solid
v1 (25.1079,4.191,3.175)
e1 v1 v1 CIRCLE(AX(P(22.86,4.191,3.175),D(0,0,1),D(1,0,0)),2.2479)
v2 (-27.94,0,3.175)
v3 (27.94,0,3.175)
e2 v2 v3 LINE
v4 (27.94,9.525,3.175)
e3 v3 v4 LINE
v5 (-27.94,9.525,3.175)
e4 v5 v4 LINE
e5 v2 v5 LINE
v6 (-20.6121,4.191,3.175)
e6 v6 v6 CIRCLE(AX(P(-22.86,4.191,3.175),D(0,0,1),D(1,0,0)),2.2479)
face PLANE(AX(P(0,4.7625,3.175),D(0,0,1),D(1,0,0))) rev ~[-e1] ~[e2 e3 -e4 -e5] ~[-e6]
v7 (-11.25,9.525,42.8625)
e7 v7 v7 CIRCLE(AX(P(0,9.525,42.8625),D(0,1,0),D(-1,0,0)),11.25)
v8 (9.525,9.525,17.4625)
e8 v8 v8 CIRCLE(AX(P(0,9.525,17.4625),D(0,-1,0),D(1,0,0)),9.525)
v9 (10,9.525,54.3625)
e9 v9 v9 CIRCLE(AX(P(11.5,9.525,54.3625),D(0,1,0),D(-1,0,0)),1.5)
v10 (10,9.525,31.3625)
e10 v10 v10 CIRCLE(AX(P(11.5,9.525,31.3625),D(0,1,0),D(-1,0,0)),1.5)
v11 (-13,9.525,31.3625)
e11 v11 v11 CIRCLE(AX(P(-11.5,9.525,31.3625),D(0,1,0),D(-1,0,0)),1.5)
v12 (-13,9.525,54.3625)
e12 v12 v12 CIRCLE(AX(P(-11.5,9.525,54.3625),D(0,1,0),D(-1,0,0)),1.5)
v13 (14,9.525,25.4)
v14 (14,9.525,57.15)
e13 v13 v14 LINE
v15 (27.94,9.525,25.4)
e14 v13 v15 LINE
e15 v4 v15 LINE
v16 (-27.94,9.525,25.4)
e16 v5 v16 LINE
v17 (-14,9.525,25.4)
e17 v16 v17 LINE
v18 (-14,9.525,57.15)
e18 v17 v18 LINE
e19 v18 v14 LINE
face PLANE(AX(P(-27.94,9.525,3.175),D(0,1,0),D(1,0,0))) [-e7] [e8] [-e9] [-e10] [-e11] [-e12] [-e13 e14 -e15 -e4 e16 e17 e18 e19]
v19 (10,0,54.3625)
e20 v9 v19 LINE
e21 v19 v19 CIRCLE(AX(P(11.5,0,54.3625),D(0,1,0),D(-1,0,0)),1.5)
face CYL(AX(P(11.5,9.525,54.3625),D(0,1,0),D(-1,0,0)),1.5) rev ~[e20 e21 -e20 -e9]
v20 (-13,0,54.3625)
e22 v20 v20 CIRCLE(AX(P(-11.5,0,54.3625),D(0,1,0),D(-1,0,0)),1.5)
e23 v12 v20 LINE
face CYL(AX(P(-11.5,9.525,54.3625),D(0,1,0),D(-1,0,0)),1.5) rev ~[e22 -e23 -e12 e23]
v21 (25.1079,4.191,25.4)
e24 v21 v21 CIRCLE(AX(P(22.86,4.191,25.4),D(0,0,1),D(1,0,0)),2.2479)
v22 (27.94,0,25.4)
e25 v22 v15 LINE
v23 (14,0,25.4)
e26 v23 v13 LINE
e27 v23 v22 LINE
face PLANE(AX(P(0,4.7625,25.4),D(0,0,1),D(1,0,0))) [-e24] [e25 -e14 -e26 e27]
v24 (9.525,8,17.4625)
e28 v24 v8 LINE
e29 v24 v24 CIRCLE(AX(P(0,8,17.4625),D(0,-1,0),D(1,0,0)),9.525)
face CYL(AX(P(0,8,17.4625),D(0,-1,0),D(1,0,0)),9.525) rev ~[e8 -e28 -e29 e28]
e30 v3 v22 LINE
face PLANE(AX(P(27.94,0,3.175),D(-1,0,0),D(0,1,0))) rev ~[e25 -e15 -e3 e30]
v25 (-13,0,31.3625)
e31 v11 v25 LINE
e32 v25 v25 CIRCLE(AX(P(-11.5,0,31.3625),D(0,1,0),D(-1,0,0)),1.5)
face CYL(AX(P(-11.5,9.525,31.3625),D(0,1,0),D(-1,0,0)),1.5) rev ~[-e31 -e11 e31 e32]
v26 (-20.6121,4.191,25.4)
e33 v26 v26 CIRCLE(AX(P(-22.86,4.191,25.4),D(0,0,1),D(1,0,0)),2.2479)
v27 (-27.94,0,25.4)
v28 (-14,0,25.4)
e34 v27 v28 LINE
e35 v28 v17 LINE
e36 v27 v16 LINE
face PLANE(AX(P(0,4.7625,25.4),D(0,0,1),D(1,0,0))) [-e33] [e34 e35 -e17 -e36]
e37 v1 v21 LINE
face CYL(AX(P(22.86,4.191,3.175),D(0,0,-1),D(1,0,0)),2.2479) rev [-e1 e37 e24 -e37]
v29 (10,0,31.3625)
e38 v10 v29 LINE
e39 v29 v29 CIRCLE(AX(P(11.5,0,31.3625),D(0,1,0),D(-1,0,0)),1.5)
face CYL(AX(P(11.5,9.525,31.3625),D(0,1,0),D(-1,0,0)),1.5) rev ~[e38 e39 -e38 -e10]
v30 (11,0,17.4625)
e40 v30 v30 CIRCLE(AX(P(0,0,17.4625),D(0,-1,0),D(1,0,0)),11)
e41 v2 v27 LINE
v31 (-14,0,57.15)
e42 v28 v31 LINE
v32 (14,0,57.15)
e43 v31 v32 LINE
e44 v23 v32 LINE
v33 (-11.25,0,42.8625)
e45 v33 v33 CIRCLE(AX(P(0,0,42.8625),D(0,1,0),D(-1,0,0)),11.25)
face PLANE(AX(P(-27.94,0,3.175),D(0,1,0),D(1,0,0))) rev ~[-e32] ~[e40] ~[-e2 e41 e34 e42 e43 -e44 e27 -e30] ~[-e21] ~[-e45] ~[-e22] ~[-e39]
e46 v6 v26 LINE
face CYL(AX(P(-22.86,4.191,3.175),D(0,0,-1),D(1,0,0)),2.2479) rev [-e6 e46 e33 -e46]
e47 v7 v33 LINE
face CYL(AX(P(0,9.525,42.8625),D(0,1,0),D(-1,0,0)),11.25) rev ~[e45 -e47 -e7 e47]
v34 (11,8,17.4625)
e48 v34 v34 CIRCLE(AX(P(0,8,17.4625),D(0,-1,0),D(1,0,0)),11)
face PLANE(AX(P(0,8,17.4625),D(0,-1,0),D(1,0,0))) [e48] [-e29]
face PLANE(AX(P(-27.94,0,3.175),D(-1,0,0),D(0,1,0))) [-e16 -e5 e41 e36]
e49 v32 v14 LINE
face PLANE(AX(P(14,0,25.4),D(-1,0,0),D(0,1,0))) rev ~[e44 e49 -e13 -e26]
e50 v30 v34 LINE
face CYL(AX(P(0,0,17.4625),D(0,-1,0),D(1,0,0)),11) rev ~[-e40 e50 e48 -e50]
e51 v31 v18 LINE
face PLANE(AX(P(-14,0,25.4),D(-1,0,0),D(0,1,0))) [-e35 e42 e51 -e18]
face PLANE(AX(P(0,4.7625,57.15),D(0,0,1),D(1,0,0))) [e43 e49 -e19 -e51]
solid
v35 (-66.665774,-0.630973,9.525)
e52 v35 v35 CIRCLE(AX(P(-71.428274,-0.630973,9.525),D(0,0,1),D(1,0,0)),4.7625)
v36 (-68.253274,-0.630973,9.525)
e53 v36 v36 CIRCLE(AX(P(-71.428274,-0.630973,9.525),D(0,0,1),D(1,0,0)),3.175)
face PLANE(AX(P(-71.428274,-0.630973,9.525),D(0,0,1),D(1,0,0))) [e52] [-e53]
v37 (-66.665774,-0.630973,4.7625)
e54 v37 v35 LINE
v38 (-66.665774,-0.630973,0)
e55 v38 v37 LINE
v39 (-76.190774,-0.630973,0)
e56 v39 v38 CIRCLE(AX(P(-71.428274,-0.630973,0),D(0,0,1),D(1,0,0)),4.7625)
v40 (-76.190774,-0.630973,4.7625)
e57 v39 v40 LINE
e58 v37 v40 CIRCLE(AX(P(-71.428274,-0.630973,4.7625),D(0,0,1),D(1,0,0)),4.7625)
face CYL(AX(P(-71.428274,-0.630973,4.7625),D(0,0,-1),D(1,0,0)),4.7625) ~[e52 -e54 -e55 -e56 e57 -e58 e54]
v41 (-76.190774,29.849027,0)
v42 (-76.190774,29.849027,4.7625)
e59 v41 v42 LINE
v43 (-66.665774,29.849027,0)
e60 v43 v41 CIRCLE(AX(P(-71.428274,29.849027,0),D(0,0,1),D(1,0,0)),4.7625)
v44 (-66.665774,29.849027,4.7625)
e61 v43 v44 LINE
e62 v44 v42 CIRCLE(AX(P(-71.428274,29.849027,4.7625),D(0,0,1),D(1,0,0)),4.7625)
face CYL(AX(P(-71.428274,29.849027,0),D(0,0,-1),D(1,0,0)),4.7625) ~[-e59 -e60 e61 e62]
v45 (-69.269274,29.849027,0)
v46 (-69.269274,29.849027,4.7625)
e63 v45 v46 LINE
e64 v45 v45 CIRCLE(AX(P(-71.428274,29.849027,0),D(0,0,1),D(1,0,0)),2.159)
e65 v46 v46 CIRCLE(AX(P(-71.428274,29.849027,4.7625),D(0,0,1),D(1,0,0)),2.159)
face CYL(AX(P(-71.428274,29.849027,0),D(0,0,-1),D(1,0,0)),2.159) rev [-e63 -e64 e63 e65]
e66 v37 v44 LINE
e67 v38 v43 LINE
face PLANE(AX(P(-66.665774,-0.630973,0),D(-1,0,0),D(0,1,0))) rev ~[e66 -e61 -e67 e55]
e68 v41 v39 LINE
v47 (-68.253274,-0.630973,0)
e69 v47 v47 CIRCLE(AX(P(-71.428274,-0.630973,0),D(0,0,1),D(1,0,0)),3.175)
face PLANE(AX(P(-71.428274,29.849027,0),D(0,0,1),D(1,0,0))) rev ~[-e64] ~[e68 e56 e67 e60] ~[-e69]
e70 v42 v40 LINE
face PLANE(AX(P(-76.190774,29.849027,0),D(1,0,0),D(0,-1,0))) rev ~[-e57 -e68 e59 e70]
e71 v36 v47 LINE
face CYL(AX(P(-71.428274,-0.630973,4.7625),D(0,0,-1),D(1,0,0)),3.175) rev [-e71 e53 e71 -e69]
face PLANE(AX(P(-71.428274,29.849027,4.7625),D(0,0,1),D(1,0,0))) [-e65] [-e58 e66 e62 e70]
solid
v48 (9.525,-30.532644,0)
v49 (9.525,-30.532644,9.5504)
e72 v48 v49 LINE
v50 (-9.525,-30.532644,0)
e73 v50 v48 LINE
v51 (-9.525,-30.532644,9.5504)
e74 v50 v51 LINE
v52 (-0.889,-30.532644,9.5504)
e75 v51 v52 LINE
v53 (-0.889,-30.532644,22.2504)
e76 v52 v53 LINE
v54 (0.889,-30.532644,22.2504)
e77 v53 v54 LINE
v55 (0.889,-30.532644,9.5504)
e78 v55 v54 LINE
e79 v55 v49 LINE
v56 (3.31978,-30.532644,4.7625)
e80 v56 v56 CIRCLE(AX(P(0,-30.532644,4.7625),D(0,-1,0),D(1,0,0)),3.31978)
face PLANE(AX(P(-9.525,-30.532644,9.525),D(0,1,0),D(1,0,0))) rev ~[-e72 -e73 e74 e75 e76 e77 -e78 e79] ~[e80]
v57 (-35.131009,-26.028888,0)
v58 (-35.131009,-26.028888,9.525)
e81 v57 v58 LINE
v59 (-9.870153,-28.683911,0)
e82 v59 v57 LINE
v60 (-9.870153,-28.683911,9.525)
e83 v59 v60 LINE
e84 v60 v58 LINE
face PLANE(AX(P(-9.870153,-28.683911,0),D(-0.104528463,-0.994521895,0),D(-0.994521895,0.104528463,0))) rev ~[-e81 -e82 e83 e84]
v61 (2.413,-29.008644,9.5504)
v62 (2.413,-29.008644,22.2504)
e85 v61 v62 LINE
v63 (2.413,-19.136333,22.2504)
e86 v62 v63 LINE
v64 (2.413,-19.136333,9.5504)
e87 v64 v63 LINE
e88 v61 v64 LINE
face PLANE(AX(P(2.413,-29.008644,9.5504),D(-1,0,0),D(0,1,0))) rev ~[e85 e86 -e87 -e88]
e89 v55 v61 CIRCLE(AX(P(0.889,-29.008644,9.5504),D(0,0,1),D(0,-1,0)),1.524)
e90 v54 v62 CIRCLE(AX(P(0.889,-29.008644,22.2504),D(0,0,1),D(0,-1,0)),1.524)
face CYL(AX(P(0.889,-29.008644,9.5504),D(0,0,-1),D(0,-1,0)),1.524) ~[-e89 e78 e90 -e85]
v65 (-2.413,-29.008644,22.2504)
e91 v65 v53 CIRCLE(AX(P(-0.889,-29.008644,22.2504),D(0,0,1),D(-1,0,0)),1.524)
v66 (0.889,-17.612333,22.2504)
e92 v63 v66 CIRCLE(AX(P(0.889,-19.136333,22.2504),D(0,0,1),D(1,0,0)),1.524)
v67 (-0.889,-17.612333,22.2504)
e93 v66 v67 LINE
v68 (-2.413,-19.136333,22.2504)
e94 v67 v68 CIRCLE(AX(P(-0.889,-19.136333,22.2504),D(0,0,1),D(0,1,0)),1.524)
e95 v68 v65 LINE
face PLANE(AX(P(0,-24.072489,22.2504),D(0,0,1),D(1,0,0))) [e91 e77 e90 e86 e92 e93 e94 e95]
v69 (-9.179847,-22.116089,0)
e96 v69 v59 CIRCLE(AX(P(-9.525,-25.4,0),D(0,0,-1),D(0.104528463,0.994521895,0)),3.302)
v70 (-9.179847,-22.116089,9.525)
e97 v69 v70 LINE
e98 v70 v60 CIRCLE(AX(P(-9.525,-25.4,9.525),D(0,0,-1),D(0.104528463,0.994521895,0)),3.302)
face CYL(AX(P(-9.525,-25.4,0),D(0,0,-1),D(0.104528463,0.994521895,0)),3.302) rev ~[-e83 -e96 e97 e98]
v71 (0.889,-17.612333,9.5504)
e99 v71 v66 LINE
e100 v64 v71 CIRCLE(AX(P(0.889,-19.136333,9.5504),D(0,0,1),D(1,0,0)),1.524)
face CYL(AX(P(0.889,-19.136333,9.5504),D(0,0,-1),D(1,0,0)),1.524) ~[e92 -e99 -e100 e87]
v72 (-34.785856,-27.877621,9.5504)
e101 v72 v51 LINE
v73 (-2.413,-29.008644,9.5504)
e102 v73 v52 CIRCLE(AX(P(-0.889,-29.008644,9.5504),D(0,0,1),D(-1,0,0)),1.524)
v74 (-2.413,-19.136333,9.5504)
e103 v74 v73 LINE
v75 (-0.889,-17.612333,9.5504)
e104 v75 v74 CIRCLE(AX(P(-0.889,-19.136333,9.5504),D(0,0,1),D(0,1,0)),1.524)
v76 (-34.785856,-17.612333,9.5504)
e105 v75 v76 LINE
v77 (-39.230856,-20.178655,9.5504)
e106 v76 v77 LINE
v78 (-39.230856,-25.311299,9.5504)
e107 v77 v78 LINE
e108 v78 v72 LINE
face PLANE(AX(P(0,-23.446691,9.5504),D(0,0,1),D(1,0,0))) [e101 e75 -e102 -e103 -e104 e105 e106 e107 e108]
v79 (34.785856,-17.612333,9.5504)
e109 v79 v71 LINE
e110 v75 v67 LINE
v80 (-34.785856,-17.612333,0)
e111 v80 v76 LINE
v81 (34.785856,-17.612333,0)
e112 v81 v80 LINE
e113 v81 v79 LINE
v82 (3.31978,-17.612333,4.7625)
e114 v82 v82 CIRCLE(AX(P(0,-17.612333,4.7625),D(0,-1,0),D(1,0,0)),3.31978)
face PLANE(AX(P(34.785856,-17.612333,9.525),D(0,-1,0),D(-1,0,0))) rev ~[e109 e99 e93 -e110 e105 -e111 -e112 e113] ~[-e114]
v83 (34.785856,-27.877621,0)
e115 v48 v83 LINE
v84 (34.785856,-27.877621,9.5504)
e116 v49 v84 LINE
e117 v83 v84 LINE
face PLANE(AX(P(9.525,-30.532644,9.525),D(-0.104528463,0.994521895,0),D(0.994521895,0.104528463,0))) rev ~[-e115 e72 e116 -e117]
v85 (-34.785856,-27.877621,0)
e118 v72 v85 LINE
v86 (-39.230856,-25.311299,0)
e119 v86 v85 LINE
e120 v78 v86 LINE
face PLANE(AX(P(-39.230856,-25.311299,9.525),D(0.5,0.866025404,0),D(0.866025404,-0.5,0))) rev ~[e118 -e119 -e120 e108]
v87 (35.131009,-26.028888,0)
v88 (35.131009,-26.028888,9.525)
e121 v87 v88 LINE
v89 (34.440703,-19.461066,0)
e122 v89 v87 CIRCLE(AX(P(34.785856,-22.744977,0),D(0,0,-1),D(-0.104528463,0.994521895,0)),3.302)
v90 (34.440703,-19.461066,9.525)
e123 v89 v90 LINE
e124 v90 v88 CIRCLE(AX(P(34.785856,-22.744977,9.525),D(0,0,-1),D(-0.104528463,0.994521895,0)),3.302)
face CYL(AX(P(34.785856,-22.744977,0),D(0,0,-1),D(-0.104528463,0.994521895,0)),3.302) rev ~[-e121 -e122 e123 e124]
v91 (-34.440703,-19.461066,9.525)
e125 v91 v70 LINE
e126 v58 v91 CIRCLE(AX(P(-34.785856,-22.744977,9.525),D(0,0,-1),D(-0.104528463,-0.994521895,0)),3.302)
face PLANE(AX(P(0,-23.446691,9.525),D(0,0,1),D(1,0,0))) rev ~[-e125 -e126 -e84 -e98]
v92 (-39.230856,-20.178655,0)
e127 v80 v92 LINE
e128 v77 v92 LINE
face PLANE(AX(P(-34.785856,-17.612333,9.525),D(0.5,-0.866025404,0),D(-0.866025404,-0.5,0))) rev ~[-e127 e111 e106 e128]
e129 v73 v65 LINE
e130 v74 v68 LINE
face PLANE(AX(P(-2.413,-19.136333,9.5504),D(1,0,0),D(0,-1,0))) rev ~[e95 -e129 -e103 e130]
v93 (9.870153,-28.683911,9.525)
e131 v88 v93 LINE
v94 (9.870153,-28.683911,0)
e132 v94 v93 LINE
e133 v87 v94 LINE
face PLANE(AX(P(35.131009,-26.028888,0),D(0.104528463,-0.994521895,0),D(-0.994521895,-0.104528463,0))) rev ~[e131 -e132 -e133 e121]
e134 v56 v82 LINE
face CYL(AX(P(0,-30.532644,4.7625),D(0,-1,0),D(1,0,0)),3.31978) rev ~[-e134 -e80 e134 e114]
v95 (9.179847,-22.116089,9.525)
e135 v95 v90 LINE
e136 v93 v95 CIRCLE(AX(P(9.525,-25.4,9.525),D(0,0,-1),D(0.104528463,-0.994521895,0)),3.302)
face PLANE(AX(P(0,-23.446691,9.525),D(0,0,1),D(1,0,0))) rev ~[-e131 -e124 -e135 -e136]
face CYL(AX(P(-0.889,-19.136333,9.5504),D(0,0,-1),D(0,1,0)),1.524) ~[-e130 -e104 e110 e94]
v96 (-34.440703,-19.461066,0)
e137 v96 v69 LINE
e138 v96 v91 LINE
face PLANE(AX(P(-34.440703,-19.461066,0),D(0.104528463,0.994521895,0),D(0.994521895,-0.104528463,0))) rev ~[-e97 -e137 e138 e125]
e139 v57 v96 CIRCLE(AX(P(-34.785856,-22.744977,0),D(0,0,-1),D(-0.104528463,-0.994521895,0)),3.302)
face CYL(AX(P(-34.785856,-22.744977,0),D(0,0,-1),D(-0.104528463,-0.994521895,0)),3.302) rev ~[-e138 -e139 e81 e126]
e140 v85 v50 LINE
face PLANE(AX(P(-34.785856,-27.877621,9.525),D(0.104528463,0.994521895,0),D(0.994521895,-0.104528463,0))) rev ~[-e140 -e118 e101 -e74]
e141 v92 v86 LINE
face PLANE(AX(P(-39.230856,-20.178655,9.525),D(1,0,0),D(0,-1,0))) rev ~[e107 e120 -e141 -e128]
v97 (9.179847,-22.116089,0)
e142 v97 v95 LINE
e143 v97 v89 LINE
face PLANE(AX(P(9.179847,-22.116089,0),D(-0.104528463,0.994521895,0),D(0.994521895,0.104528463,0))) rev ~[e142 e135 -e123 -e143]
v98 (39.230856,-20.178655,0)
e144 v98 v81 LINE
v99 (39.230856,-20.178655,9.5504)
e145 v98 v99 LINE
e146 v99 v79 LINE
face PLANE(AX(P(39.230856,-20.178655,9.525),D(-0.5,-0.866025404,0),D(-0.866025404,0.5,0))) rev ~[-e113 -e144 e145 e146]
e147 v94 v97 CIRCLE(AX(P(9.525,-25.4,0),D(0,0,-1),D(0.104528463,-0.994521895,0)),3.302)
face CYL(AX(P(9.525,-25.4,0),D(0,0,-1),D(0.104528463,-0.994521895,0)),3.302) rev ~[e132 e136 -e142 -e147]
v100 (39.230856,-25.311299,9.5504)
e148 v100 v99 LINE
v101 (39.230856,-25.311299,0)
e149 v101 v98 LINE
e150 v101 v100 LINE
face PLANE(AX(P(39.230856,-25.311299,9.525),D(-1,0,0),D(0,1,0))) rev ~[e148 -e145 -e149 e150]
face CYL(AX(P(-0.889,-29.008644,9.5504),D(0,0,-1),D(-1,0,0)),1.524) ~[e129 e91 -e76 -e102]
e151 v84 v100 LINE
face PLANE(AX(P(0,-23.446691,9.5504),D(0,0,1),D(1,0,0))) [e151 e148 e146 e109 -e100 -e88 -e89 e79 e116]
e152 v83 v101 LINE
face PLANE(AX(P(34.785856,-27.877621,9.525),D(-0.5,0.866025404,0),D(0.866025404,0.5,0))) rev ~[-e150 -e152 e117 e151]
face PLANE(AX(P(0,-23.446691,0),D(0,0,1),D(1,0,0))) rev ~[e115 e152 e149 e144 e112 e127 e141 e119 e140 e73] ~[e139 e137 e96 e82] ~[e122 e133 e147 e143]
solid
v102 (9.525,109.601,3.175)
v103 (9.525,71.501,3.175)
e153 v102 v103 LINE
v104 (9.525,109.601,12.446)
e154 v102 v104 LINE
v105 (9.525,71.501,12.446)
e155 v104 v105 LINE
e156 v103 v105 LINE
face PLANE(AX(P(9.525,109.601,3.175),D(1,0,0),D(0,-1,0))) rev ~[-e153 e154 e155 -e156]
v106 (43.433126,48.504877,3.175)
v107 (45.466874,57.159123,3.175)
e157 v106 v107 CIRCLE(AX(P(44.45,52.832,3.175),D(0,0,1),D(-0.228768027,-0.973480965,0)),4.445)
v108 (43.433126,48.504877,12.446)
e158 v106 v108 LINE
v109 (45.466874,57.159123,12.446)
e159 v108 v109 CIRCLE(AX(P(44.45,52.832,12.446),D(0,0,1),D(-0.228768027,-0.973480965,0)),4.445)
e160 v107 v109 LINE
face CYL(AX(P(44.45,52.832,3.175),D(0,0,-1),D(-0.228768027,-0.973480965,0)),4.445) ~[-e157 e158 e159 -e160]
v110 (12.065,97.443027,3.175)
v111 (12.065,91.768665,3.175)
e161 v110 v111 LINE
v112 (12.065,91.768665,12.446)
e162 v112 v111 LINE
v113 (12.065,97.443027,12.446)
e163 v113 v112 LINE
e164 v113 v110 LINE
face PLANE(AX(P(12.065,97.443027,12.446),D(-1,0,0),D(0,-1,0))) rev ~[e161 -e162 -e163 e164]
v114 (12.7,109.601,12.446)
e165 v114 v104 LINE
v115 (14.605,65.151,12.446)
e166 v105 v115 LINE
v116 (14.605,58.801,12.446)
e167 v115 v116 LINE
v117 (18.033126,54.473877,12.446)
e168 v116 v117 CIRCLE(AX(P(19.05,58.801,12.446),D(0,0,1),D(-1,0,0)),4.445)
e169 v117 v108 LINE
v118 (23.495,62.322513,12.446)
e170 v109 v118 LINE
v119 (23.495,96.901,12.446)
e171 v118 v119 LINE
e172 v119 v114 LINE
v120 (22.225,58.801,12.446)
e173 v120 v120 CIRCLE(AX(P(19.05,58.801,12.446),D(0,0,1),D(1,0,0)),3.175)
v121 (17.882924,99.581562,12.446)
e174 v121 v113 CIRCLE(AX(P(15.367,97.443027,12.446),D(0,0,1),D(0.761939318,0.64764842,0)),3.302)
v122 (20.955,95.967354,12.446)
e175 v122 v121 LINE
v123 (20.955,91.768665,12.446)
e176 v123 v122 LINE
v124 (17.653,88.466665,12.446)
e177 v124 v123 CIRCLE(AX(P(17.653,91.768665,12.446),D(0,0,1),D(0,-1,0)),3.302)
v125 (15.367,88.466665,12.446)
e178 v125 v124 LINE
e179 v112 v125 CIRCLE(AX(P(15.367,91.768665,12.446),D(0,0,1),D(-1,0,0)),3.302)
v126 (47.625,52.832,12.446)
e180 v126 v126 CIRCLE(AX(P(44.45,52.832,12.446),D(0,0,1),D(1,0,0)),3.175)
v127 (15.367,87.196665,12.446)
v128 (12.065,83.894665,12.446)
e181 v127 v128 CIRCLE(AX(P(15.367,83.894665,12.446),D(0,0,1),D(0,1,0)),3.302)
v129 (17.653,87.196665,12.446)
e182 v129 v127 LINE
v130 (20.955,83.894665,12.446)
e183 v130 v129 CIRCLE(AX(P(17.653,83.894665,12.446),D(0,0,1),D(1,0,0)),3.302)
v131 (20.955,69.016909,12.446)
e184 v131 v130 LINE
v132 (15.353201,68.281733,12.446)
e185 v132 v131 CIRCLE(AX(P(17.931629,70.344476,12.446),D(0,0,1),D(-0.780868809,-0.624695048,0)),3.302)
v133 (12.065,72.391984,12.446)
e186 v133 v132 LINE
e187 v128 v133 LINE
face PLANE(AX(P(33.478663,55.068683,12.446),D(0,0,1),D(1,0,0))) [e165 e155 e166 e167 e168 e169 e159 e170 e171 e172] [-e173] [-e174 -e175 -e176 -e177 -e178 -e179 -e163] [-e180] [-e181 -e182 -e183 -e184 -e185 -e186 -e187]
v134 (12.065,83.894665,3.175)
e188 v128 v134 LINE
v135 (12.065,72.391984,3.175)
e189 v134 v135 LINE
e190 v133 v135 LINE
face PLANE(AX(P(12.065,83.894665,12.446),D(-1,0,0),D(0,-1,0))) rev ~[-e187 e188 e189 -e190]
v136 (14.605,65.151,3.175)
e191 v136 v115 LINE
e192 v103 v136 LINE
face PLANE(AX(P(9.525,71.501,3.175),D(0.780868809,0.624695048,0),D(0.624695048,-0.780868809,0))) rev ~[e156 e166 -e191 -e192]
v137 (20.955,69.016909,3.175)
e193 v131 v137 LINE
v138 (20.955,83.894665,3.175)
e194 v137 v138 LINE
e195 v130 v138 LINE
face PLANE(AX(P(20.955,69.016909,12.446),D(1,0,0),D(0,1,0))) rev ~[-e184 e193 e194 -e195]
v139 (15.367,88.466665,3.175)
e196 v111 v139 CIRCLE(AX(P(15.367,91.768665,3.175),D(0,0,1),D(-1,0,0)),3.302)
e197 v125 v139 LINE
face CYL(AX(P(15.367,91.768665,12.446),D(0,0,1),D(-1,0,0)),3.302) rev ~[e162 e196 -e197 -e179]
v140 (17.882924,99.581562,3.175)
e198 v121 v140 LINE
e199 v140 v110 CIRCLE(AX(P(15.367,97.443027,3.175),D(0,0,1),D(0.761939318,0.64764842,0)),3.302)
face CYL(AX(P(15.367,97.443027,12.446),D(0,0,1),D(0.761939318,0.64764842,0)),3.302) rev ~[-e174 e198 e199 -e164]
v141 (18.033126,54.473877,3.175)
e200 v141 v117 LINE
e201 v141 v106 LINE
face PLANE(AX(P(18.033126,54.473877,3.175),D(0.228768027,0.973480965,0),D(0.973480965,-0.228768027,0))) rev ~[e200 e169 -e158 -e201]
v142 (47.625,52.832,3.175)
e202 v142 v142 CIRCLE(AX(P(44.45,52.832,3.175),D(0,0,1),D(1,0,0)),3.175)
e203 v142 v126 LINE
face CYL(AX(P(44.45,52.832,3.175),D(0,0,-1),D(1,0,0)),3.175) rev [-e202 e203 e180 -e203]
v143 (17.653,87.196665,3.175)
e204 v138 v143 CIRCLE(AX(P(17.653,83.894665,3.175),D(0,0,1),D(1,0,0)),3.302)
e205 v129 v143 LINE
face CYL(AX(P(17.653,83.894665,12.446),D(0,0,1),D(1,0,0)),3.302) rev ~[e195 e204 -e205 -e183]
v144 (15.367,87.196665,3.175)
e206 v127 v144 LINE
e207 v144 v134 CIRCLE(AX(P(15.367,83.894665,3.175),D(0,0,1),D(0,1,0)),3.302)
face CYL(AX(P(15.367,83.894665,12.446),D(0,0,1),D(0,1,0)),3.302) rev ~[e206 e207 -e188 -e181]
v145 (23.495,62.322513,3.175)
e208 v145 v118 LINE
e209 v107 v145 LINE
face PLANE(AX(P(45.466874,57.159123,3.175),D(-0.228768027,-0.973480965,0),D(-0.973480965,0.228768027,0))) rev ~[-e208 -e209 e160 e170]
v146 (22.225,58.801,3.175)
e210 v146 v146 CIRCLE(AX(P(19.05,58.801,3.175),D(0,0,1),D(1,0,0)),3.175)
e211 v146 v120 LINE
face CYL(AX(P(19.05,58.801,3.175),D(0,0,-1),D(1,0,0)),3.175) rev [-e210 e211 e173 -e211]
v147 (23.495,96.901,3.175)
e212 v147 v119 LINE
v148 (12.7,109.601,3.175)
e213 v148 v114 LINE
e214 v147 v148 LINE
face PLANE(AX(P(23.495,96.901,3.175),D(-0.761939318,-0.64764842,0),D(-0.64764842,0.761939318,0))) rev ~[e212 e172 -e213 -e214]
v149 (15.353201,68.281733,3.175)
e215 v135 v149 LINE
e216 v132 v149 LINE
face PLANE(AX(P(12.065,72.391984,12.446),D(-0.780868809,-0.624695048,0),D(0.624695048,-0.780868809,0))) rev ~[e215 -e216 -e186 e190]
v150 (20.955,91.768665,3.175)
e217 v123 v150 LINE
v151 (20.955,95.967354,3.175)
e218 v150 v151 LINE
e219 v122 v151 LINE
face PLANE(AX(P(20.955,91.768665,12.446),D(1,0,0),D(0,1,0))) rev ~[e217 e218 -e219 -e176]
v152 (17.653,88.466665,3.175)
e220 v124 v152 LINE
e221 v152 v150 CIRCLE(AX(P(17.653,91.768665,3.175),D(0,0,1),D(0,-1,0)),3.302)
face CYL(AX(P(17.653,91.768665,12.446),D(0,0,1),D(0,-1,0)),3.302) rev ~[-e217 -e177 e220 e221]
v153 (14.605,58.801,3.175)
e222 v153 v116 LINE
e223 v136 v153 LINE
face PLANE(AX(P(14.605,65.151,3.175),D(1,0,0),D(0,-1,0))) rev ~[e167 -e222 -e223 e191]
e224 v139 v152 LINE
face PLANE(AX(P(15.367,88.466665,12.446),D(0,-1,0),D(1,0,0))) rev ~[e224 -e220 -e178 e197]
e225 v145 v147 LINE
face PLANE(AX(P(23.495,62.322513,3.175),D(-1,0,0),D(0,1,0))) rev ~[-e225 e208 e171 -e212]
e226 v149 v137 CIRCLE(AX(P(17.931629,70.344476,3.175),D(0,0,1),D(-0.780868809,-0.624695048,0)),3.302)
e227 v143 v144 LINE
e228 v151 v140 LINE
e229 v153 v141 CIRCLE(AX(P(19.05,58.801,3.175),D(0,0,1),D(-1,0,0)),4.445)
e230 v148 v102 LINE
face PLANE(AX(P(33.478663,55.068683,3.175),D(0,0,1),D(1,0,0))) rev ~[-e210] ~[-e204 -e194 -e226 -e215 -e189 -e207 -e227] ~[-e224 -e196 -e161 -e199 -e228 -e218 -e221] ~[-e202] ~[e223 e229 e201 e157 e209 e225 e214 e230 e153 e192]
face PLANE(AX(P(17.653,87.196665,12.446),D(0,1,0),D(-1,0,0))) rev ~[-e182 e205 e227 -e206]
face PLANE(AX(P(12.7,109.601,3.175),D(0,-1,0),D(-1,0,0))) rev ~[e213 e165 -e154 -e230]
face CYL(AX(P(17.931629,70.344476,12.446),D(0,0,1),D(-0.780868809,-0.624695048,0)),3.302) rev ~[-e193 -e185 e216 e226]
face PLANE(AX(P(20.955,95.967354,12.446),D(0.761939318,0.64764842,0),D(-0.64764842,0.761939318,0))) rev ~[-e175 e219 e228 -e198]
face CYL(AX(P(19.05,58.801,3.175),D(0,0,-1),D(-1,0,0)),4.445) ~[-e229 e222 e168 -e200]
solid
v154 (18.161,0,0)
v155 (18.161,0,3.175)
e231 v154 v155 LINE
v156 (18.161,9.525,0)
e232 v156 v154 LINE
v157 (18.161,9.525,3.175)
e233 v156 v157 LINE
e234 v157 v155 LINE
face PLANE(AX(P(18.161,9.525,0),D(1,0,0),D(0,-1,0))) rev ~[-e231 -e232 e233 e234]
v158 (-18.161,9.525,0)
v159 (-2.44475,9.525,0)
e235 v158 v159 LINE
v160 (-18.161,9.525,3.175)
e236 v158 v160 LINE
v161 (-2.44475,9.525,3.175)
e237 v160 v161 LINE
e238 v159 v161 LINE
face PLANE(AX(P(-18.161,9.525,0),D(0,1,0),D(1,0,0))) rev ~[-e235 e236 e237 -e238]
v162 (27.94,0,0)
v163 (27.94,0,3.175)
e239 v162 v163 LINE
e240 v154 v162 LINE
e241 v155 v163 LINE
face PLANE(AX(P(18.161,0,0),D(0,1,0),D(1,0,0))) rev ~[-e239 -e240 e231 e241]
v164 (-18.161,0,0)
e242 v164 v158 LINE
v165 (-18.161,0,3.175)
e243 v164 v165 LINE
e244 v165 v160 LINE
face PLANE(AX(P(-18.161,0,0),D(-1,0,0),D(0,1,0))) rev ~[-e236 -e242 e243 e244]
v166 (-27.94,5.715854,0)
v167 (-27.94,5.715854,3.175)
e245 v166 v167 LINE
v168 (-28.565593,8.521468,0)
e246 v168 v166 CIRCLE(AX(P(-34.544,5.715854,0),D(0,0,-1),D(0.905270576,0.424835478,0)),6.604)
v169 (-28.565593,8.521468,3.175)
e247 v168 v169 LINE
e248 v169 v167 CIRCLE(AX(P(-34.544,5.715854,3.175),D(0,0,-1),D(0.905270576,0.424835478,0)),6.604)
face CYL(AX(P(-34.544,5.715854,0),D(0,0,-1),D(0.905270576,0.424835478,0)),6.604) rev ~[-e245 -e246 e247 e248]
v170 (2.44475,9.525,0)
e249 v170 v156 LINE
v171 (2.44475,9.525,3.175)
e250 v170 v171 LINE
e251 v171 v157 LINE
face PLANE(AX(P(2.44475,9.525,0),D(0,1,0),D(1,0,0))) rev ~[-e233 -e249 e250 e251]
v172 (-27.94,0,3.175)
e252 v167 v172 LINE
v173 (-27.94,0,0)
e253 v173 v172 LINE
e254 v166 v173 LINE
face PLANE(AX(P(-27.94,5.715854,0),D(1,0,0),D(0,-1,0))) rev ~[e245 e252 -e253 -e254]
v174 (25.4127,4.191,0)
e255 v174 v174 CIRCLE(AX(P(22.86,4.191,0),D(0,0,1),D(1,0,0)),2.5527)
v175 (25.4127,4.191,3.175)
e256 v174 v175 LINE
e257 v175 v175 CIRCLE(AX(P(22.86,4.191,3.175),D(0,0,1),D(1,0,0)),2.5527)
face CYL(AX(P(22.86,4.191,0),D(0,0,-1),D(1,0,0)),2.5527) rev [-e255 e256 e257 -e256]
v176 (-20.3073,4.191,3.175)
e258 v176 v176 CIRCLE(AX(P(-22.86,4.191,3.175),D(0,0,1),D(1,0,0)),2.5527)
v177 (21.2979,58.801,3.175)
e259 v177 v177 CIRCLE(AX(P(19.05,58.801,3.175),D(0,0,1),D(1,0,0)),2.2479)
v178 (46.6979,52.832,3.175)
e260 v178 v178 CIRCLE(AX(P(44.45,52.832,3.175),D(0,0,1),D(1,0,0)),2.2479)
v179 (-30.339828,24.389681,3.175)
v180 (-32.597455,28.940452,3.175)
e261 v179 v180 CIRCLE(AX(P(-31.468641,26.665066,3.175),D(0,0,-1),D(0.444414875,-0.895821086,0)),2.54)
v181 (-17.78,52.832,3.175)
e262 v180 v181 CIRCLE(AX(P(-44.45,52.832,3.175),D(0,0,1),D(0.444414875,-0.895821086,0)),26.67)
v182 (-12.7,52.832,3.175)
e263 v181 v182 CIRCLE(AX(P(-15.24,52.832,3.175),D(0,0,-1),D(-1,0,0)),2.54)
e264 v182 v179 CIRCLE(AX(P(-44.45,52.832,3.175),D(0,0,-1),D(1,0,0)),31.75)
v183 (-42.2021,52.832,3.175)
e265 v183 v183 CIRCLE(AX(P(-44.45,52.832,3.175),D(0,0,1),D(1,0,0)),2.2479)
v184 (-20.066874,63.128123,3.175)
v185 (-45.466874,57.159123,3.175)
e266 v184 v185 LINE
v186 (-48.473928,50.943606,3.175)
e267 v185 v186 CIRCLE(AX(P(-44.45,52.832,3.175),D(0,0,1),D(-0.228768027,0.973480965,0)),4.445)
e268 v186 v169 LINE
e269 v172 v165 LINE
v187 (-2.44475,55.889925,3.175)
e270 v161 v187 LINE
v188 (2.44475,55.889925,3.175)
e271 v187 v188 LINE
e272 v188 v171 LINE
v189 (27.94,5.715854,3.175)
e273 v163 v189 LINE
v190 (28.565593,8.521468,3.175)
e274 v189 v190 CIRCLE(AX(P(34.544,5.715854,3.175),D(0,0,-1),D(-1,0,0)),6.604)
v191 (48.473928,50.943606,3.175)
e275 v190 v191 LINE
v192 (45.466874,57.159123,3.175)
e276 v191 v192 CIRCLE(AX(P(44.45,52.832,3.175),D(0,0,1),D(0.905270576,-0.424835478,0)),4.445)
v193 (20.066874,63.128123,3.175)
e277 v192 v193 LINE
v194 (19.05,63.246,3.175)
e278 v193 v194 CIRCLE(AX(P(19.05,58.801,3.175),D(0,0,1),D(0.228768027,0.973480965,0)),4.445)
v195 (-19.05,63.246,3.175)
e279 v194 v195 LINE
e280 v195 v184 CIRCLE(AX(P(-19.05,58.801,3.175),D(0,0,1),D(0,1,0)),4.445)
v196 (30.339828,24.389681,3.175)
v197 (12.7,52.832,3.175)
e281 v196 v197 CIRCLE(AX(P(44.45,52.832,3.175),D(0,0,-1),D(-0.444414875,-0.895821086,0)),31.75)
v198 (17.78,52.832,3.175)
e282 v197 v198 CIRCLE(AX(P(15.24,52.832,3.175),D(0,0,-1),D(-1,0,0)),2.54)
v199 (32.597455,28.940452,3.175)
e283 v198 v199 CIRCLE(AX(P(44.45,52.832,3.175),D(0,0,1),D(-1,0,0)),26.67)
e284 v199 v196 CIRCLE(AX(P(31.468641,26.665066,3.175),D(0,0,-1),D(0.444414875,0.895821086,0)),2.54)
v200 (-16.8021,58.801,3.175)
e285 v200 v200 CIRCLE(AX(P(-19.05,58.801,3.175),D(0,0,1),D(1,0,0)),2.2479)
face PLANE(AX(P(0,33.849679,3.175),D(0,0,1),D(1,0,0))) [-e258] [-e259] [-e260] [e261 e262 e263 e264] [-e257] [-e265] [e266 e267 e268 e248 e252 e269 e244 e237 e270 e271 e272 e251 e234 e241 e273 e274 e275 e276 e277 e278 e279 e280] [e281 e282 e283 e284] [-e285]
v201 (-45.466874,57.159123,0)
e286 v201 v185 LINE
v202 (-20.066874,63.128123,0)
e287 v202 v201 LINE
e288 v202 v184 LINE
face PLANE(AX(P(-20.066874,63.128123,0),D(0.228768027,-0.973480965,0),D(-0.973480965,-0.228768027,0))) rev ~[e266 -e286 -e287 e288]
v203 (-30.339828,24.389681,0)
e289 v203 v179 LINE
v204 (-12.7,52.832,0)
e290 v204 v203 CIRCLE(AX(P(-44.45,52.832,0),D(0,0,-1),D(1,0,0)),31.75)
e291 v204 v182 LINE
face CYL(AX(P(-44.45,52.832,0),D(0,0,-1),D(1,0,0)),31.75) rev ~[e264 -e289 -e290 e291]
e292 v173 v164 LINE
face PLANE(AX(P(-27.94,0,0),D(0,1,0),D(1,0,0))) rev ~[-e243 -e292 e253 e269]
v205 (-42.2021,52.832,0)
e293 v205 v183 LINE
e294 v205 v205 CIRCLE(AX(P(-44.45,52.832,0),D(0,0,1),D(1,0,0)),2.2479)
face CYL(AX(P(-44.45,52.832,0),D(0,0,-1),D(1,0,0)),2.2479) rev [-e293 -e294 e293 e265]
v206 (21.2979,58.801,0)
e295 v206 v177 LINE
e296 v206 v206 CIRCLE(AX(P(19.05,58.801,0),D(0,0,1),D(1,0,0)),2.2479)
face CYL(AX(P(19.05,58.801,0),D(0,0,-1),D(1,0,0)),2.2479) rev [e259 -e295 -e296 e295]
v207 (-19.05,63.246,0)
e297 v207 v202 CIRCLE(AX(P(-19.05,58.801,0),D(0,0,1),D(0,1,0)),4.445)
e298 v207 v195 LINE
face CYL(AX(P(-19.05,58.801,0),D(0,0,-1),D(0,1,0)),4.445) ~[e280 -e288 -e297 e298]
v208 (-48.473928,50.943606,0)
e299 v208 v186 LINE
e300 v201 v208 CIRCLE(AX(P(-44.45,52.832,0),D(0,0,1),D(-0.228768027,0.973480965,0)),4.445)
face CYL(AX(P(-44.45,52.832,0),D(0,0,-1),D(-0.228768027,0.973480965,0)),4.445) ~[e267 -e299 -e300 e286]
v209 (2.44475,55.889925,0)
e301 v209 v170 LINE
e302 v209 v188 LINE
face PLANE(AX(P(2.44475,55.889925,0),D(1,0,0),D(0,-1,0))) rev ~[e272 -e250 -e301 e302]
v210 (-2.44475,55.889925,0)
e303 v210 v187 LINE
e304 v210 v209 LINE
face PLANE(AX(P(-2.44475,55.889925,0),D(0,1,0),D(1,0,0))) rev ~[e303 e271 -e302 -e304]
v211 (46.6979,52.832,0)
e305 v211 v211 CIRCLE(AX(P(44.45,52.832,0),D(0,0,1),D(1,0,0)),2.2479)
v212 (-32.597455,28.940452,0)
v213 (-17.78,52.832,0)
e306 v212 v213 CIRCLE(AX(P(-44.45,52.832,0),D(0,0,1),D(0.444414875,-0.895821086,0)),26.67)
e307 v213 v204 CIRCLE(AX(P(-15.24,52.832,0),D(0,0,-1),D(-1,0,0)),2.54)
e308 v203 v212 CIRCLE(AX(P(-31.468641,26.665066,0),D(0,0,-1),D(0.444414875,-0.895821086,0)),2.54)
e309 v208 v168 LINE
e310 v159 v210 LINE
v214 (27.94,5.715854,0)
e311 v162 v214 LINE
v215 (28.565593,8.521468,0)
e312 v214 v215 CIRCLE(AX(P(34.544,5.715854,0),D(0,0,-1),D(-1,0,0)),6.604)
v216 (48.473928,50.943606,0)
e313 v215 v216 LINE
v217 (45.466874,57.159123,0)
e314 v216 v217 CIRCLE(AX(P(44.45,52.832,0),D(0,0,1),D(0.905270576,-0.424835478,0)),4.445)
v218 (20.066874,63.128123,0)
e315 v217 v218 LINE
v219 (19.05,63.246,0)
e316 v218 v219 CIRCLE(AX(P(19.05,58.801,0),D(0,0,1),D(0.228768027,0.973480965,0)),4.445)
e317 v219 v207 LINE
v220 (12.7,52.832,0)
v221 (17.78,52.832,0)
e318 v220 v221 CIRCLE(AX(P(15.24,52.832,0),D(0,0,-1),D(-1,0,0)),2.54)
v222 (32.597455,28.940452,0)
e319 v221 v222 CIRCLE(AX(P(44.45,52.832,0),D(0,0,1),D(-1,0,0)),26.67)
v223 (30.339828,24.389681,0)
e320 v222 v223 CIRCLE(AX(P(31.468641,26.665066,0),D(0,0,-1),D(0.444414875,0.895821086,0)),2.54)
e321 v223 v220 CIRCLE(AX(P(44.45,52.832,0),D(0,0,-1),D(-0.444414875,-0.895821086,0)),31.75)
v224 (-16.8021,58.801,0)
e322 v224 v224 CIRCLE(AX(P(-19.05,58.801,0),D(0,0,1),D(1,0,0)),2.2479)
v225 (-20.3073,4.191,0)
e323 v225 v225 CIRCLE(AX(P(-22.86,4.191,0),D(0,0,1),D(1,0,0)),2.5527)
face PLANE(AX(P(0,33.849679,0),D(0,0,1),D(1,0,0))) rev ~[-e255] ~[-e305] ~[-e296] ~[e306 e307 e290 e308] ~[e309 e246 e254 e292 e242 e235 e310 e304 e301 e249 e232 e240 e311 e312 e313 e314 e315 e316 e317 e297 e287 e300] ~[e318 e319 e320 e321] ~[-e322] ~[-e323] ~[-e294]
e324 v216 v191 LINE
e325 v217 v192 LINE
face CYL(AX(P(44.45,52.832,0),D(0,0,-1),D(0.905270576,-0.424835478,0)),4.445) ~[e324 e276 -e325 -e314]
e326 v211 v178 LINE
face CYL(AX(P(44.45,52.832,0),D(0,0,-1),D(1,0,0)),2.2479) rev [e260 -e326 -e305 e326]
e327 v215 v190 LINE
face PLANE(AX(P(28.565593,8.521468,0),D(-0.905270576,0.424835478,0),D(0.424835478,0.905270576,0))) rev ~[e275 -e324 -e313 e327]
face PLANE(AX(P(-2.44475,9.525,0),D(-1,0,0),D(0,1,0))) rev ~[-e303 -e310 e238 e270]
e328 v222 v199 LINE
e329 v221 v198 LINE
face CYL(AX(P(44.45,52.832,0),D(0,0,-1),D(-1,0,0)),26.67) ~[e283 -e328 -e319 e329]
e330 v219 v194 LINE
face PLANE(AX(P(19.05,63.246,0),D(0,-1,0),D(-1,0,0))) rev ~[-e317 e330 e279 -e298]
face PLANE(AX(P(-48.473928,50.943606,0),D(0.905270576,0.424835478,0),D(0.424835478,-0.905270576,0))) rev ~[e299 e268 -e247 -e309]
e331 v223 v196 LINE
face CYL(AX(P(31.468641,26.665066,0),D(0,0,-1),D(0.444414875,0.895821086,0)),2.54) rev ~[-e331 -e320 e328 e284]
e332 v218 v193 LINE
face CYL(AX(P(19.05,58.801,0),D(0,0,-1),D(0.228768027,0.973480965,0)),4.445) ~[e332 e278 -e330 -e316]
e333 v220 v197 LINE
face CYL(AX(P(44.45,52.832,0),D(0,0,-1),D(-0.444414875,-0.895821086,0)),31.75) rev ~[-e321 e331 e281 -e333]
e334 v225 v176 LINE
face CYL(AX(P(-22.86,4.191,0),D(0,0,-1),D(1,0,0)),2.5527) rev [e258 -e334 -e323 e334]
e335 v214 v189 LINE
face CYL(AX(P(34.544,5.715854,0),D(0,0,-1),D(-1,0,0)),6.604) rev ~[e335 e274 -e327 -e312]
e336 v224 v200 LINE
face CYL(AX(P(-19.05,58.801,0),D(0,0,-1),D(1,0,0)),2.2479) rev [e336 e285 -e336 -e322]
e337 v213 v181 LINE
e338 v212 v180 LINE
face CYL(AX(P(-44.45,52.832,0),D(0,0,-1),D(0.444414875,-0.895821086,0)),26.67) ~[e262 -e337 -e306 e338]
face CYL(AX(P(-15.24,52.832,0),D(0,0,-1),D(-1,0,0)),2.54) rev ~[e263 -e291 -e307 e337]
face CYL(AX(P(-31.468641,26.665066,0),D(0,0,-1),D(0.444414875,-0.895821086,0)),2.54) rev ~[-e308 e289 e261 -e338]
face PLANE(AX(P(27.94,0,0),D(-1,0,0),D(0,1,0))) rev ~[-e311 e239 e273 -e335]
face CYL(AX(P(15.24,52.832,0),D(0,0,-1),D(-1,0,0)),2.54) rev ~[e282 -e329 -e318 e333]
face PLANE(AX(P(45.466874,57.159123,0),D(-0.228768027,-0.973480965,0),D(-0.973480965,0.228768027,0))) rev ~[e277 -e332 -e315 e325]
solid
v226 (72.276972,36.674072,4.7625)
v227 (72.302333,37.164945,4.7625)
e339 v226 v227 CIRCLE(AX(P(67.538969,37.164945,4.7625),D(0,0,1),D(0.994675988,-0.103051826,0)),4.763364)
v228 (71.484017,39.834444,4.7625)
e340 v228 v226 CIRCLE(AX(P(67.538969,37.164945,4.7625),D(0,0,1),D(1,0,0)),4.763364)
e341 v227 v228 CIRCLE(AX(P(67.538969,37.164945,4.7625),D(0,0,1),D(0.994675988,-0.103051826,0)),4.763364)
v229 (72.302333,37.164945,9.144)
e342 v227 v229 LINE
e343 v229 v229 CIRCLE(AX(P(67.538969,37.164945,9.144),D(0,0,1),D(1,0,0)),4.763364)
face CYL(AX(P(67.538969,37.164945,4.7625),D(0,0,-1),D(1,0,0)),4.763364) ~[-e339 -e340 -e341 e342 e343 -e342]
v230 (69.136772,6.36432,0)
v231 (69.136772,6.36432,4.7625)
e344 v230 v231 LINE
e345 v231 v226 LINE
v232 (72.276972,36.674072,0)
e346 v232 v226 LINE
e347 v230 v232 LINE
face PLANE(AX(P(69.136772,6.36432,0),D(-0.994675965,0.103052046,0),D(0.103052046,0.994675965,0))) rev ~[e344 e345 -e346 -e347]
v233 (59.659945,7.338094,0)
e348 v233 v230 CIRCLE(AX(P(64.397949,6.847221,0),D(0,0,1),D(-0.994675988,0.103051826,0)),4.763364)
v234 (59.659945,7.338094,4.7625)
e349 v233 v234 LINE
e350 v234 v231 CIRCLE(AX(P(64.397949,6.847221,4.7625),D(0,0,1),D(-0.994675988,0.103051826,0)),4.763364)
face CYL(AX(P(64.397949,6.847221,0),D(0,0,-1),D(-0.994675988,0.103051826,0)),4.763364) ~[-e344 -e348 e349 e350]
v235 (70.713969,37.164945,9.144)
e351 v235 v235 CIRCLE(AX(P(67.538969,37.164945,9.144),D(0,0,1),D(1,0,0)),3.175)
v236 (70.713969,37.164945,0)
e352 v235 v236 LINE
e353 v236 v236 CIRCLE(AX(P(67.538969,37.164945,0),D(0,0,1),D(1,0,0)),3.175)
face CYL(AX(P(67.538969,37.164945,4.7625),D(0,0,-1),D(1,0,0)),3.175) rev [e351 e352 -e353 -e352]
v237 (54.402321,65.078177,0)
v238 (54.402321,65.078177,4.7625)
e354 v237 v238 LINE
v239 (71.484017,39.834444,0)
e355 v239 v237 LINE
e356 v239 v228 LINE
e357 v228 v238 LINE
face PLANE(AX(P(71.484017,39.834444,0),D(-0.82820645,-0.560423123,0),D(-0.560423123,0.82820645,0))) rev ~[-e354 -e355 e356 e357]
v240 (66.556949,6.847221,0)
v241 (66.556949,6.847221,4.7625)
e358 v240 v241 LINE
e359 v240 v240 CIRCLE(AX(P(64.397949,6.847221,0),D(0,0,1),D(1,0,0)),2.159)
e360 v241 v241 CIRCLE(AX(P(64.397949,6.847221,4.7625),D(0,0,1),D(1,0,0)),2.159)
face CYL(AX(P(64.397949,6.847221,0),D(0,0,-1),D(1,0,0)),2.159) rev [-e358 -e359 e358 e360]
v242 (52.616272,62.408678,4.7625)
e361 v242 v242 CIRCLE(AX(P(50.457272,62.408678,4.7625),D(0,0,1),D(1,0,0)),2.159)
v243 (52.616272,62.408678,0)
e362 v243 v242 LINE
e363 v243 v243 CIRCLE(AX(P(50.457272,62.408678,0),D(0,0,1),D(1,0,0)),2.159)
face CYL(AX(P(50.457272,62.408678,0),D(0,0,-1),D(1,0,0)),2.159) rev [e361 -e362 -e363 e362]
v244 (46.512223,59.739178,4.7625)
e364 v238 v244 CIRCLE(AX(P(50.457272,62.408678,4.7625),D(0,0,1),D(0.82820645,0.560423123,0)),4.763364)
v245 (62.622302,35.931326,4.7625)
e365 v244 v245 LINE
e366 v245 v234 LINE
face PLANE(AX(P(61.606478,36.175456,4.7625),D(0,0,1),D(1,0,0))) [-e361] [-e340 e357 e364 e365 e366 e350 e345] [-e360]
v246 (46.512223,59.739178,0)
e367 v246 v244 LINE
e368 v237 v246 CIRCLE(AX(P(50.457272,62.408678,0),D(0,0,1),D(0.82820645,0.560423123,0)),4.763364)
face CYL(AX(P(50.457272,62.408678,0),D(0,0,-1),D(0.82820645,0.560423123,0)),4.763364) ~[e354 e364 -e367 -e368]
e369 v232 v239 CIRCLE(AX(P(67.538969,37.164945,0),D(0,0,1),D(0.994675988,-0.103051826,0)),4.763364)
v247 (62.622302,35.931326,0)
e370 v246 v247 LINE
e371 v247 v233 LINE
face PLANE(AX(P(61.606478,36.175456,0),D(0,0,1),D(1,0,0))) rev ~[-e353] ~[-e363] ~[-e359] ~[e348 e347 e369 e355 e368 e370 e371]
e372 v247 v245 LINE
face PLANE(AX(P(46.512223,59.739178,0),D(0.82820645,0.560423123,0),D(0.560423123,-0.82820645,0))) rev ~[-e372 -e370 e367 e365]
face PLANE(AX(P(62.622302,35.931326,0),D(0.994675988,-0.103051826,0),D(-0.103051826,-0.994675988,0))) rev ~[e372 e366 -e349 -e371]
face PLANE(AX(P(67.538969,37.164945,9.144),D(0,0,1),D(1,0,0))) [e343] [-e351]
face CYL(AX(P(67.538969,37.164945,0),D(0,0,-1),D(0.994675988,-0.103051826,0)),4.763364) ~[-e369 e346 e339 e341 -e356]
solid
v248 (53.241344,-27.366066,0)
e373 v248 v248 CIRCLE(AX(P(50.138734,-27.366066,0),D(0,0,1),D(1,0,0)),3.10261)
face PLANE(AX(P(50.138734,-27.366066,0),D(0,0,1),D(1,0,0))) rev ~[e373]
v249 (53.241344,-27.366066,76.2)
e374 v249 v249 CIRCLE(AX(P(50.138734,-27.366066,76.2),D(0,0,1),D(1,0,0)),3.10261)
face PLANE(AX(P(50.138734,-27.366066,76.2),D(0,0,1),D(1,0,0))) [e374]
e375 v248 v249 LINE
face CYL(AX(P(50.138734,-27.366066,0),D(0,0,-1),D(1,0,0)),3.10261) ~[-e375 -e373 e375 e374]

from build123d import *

# Parameters (mm, degrees)
F0_R      = 2.5527
F0_R_2    = 2.2479
F1_DEPTH  = 3.175
F2_R      = 2.159
F2_R_2    = 3.175
F3_DEPTH  = 4.7625
F4_R      = 2.159
F4_R_2    = 3.175
F5_DEPTH  = 4.7625
F6_R      = 3.175
F7_DEPTH  = 9.271
F8_W      = 55.88
F8_H      = 9.525
F8_R      = 2.2479
F9_DEPTH  = 22.225
F10_W     = 28
F10_H     = 9.525
F11_DEPTH = 31.75
F12_R     = 11
F13_DEPTH = 8
F14_R     = 9.525
F15_DEPTH = 101.602
F16_R     = 11.25
F16_R_2   = 1.5
F17_DEPTH = 14.9194730585
F19_DEPTH = 9.525
F20_R     = 3.31978
F21_DEPTH = 140.1346438931
F22_R     = 3.10261
F23_DEPTH = 76.2
F25_DEPTH = 0.0254
F27_DEPTH = 12.7
F28_R     = 4.7625
F28_R_2   = 3.175
F29_DEPTH = 4.7625
F30_R     = 4.7633639438
F30_R_2   = 3.175
F31_DEPTH = 4.3815
F33_DEPTH = 12.447


# Not quite as in the source:
# - ends of sketch curves that miss each other by under 0.0002 mm in the source are joined


with BuildPart() as f1:
    # F0 (on Top) → F1 (new body)
    with BuildSketch(Plane.XY):
        with BuildLine():
            Line((19.05, 63.246), (-19.05, 63.246))
            ThreePointArc((-19.05, 63.246), (-19.5618416502, 63.2164323826), (-20.0668738794, 63.128122891))
            Line((-20.0668738794, 63.128122891), (-45.4668738794, 57.159122891))
            ThreePointArc((-45.4668738794, 57.159122891), (-48.451322506, 54.7678313983), (-48.4739277117, 50.9436062986))
            Line((-48.4739277117, 50.9436062986), (-28.5655931141, 8.5214677257))
            ThreePointArc((-28.5655931141, 8.5214677257), (-28.0982954196, 7.1531114974), (-27.94, 5.7158542265))
            Line((-27.94, 5.7158542265), (-27.94, 0))
            Line((-27.94, 0), (-18.161, 0))
            Line((-18.161, 0), (-18.161, 9.525))
            Line((-18.161, 9.525), (-2.44475, 9.525))
            Line((-2.44475, 9.525), (-2.44475, 55.889925157))
            Line((-2.44475, 55.889925157), (2.44475, 55.889925157))
            Line((2.44475, 55.889925157), (2.44475, 9.525))
            Line((2.44475, 9.525), (18.161, 9.525))
            Line((18.161, 9.525), (18.161, 0))
            Line((18.161, 0), (27.94, 0))
            Line((27.94, 0), (27.94, 5.7158542265))
            ThreePointArc((27.94, 5.7158542265), (28.0982954196, 7.1531114974), (28.5655931141, 8.5214677257))
            Line((28.5655931141, 8.5214677257), (48.4739277117, 50.9436062986))
            ThreePointArc((48.4739277117, 50.9436062986), (48.451322506, 54.7678313983), (45.4668738794, 57.159122891))
            Line((45.4668738794, 57.159122891), (20.0668738794, 63.128122891))
            ThreePointArc((20.0668738794, 63.128122891), (19.5618416502, 63.2164323826), (19.05, 63.246))
        make_face()
        with Locations((-22.86, 4.191)):
            Circle(F0_R, mode=Mode.SUBTRACT)
        with Locations((22.86, 4.191)):
            Circle(F0_R, mode=Mode.SUBTRACT)
        with BuildLine():
            ThreePointArc((-12.7, 52.832), (-17.4679645864, 36.0978353977), (-30.3398277126, 24.3896805091))
            ThreePointArc((-30.3398277126, 24.3896805091), (-33.7440270549, 25.5362522854), (-32.5974552786, 28.9404516277))
            ThreePointArc((-32.5974552786, 28.9404516277), (-21.7850902526, 38.775301734), (-17.78, 52.832))
            ThreePointArc((-17.78, 52.832), (-15.24, 55.372), (-12.7, 52.832))
        make_face(mode=Mode.SUBTRACT)
        with Locations((-44.45, 52.832)):
            Circle(F0_R_2, mode=Mode.SUBTRACT)
        with Locations((-19.05, 58.801)):
            Circle(F0_R_2, mode=Mode.SUBTRACT)
        with BuildLine():
            ThreePointArc((12.7, 52.832), (15.24, 55.372), (17.78, 52.832))
            ThreePointArc((17.78, 52.832), (21.7850902526, 38.775301734), (32.5974552786, 28.9404516277))
            ThreePointArc((32.5974552786, 28.9404516277), (33.7440270549, 25.5362522854), (30.3398277126, 24.3896805091))
            ThreePointArc((30.3398277126, 24.3896805091), (17.4679645864, 36.0978353977), (12.7, 52.832))
        make_face(mode=Mode.SUBTRACT)
        with Locations((19.05, 58.801)):
            Circle(F0_R_2, mode=Mode.SUBTRACT)
        with Locations((44.45, 52.832)):
            Circle(F0_R_2, mode=Mode.SUBTRACT)
    extrude(amount=F1_DEPTH)


with BuildPart() as f3:
    # F2 (on Top) → F3 (new body)
    with BuildSketch(Plane.XY):
        with BuildLine():
            ThreePointArc((-76.1907740574, 29.8490269415), (-71.4282740574, 25.0865269415), (-66.6657740574, 29.8490269415))
            ThreePointArc((-66.6657740574, 29.8490269415), (-71.4282740574, 34.6115269415), (-76.1907740574, 29.8490269415))
        make_face()
        with Locations((-71.4282740574, 29.8490269415)):
            Circle(F2_R, mode=Mode.SUBTRACT)
        with BuildLine():
            Line((-66.6657740574, -0.6309730585), (-66.6657740574, 29.8490269415))
            ThreePointArc((-66.6657740574, 29.8490269415), (-71.4282740574, 25.0865269415), (-76.1907740574, 29.8490269415))
            Line((-76.1907740574, 29.8490269415), (-76.1907740574, -0.6309730585))
            ThreePointArc((-76.1907740574, -0.6309730585), (-71.4282740574, 4.1315269415), (-66.6657740574, -0.6309730585))
        make_face()
        with BuildLine():
            ThreePointArc((-76.1907740574, -0.6309730585), (-71.4282740574, -5.3934730585), (-66.6657740574, -0.6309730585))
            ThreePointArc((-66.6657740574, -0.6309730585), (-71.4282740574, 4.1315269415), (-76.1907740574, -0.6309730585))
        make_face()
        with Locations((-71.4282740574, -0.6309730585)):
            Circle(F2_R_2, mode=Mode.SUBTRACT)
    extrude(amount=F3_DEPTH)

    # F28 (on face) → F29 (join)
    with BuildSketch(Plane.XY.offset(4.7625)):
        with Locations((-71.4282740574, -0.6309730585)):
            Circle(F28_R)
        with Locations((-71.4282740574, -0.6309730585)):
            Circle(F28_R_2, mode=Mode.SUBTRACT)
    extrude(amount=F29_DEPTH)


with BuildPart() as f5:
    # F4 (on Top) → F5 (new body)
    with BuildSketch(Plane.XY):
        with BuildLine():
            Line((71.4840174561, 39.834444246), (54.402320682, 65.0781768409))
            ThreePointArc((54.402320682, 65.0781768409), (47.7877726452, 66.3537262876), (46.5122231985, 59.7391782508))
            Line((46.5122231985, 59.7391782508), (62.6223016887, 35.9313259707))
            Line((62.6223016887, 35.9313259707), (59.6599453355, 7.3380941843))
            ThreePointArc((59.6599453355, 7.3380941843), (64.6437130785, 11.6042405017), (69.1613130167, 6.8472208344))
            ThreePointArc((69.1613130167, 6.8472208344), (69.1551738197, 6.6054590305), (69.1367720534, 6.3643204094))
            Line((69.1367720534, 6.3643204094), (72.2769724517, 36.674071601))
            ThreePointArc((72.2769724517, 36.674071601), (72.1591244371, 38.3241676037), (71.4840174561, 39.834444246))
        make_face()
        with Locations((50.4572719402, 62.4086775458)):
            Circle(F4_R, mode=Mode.SUBTRACT)
        with Locations((67.5389687143, 37.164944951)):
            Circle(F4_R_2, mode=Mode.SUBTRACT)
        with BuildLine():
            ThreePointArc((69.1613130167, 6.8472208344), (64.6437130785, 11.6042405017), (59.6599453355, 7.3380941843))
            ThreePointArc((59.6599453355, 7.3380941843), (63.9110620131, 2.1088057985), (69.1367720534, 6.3643204094))
            ThreePointArc((69.1367720534, 6.3643204094), (69.1551738197, 6.6054590305), (69.1613130167, 6.8472208344))
        make_face()
        with Locations((64.3979490729, 6.8472208344)):
            Circle(F4_R, mode=Mode.SUBTRACT)
    extrude(amount=F5_DEPTH)

    # F30 (on face) → F31 (join)
    with BuildSketch(Plane.XY.offset(4.7625)):
        with Locations((67.5389687143, 37.164944951)):
            Circle(F30_R)
        with Locations((67.5389687143, 37.164944951)):
            Circle(F30_R_2, mode=Mode.SUBTRACT)
    extrude(amount=F31_DEPTH)


with BuildPart() as f7:
    # F6 (on face) → F7 (new body)
    with BuildSketch(Plane.XY.offset(3.175)):
        with BuildLine():
            Line((18.0331261206, 54.473877109), (43.4331261206, 48.504877109))
            ThreePointArc((43.4331261206, 48.504877109), (48.777122891, 51.8151261206), (45.4668738794, 57.159122891))
            Line((45.4668738794, 57.159122891), (23.495, 62.3225132526))
            Line((23.495, 62.3225132526), (23.495, 58.801))
            ThreePointArc((23.495, 58.801), (21.8102554779, 55.3168911187), (18.0331261206, 54.473877109))
        make_face()
        with Locations((44.45, 52.832)):
            Circle(F6_R, mode=Mode.SUBTRACT)
        with BuildLine():
            ThreePointArc((14.605, 58.801), (15.5658911187, 56.0407445221), (18.0331261206, 54.473877109))
            ThreePointArc((18.0331261206, 54.473877109), (21.8102554779, 55.3168911187), (23.495, 58.801))
            Line((23.495, 58.801), (23.495, 62.3225132526))
            Line((23.495, 62.3225132526), (23.495, 96.901))
            Line((23.495, 96.901), (12.7, 109.601))
            Line((12.7, 109.601), (9.525, 109.601))
            Line((9.525, 109.601), (9.525, 71.501))
            Line((9.525, 71.501), (14.605, 65.151))
            Line((14.605, 65.151), (14.605, 58.801))
        make_face()
        with Locations((19.05, 58.801)):
            Circle(F6_R, mode=Mode.SUBTRACT)
    extrude(amount=F7_DEPTH)

    # F32 (on face) → F33 (cut, through all)
    with BuildSketch(Plane.XY.offset(12.446)):
        with BuildLine():
            Line((12.065, 83.8946654219), (12.065, 72.3919838908))
            Line((12.065, 72.3919838908), (15.353200649, 68.2817330795))
            ThreePointArc((15.353200649, 68.2817330795), (18.3612969836, 67.0705503764), (20.955, 69.0169089665))
            Line((20.955, 69.0169089665), (20.955, 83.8946654219))
            ThreePointArc((20.955, 83.8946654219), (19.9878665915, 86.2295320133), (17.653, 87.1966654219))
            Line((17.653, 87.1966654219), (15.367, 87.1966654219))
            ThreePointArc((15.367, 87.1966654219), (13.0321334085, 86.2295320133), (12.065, 83.8946654219))
        make_face()
        with BuildLine():
            Line((20.955, 91.7686654219), (20.955, 95.9673543458))
            Line((20.955, 95.9673543458), (17.8829236272, 99.5815618431))
            ThreePointArc((17.8829236272, 99.5815618431), (14.2277844403, 100.5422834303), (12.065, 97.44302676))
            Line((12.065, 97.44302676), (12.065, 91.7686654219))
            ThreePointArc((12.065, 91.7686654219), (13.0321334085, 89.4337988304), (15.367, 88.4666654219))
            Line((15.367, 88.4666654219), (17.653, 88.4666654219))
            ThreePointArc((17.653, 88.4666654219), (19.9878665915, 89.4337988304), (20.955, 91.7686654219))
        make_face()
    extrude(amount=-F33_DEPTH, mode=Mode.SUBTRACT)


with BuildPart() as f9:
    # F8 (on face) → F9 (new body)
    with BuildSketch(Plane.XY.offset(3.175)):
        with Locations((0, 4.7625)):
            Rectangle(F8_W, F8_H)
        with Locations((-22.86, 4.191)):
            Circle(F8_R, mode=Mode.SUBTRACT)
        with Locations((22.86, 4.191)):
            Circle(F8_R, mode=Mode.SUBTRACT)
    extrude(amount=F9_DEPTH)

    # F10 (on face) → F11 (join)
    with BuildSketch(Plane.XY.offset(25.4)):
        with Locations((0, 4.7625)):
            Rectangle(F10_W, F10_H)
    extrude(amount=F11_DEPTH)

    # F12 (on face) → F13 (cut)
    with BuildSketch(Plane.XZ):
        with Locations((0, 17.4625)):
            Circle(F12_R)
    extrude(amount=-F13_DEPTH, mode=Mode.SUBTRACT)

    # F14 (on face) → F15 (cut, through all)
    with BuildSketch(Plane.XZ.offset(-8)):
        with Locations((0, 17.4625)):
            Circle(F14_R)
    extrude(amount=-F15_DEPTH, mode=Mode.SUBTRACT)

    # F16 (on face) → F17 (cut, through all)
    with BuildSketch(Plane(origin=(0, 9.525, 0), x_dir=(-1, 0, 0), z_dir=(0, 1, 0))):
        with Locations((0, 42.8625)):
            Circle(F16_R)
        with Locations((11.5, 54.3625)):
            Circle(F16_R_2)
        with Locations((11.5, 31.3625)):
            Circle(F16_R_2)
        with Locations((-11.5, 31.3625)):
            Circle(F16_R_2)
        with Locations((-11.5, 54.3625)):
            Circle(F16_R_2)
    extrude(amount=-F17_DEPTH, mode=Mode.SUBTRACT)


with BuildPart() as f19:
    # F18 (on Top) → F19 (new body)
    with BuildSketch(Plane.XY):
        Polygon((-39.2308561424, -25.3112989795), (-34.7858561424, -27.8776209261), (-9.525, -30.5326438931), (9.525, -30.5326438931), (34.7858561424, -27.8776209261), (39.2308561424, -25.3112989795), (39.2308561424, -20.1786550865), (34.7858561424, -17.6123331399), (-34.7858561424, -17.6123331399), (-39.2308561424, -20.1786550865), align=None)
        with BuildLine():
            ThreePointArc((-9.1798470143, -22.1160887015), (-6.2410887015, -25.7451529857), (-9.8701529857, -28.6839112985))
            Line((-9.8701529857, -28.6839112985), (-35.1310091281, -26.0288883315))
            ThreePointArc((-35.1310091281, -26.0288883315), (-38.0697674409, -22.3998240473), (-34.4407031566, -19.4610657345))
            Line((-34.4407031566, -19.4610657345), (-9.1798470143, -22.1160887015))
        make_face(mode=Mode.SUBTRACT)
        with BuildLine():
            ThreePointArc((9.8701529857, -28.6839112985), (6.2410887015, -25.7451529857), (9.1798470143, -22.1160887015))
            Line((9.1798470143, -22.1160887015), (34.4407031566, -19.4610657345))
            ThreePointArc((34.4407031566, -19.4610657345), (38.0697674409, -22.3998240473), (35.1310091281, -26.0288883315))
            Line((35.1310091281, -26.0288883315), (9.8701529857, -28.6839112985))
        make_face(mode=Mode.SUBTRACT)
    extrude(amount=F19_DEPTH)

    # F20 (on face) → F21 (cut, through all)
    with BuildSketch(Plane.XZ.offset(30.5326438931)):
        with Locations((0, 4.7625)):
            Circle(F20_R)
    extrude(amount=-F21_DEPTH, mode=Mode.SUBTRACT)

    # F24 (on face) → F25 (join)
    with BuildSketch(Plane.XY.offset(9.525)):
        Polygon((-34.7858561424, -27.8776209261), (-9.525, -30.5326438931), (9.525, -30.5326438931), (34.7858561424, -27.8776209261), (39.2308561424, -25.3112989795), (39.2308561424, -20.1786550865), (34.7858561424, -17.6123331399), (-34.7858561424, -17.6123331399), (-39.2308561424, -20.1786550865), (-39.2308561424, -25.3112989795), align=None)
    extrude(amount=F25_DEPTH)

    # F26 (on face) → F27 (join)
    with BuildSketch(Plane.XY.offset(9.5504)):
        with BuildLine():
            Line((-0.889, -30.5326438931), (0.889, -30.5326438931))
            ThreePointArc((0.889, -30.5326438931), (1.9666307345, -30.0862746276), (2.413, -29.0086438931))
            Line((2.413, -29.0086438931), (2.413, -19.1363331399))
            ThreePointArc((2.413, -19.1363331399), (1.9666307345, -18.0587024054), (0.889, -17.6123331399))
            Line((0.889, -17.6123331399), (-0.889, -17.6123331399))
            ThreePointArc((-0.889, -17.6123331399), (-1.9666307345, -18.0587024054), (-2.413, -19.1363331399))
            Line((-2.413, -19.1363331399), (-2.413, -29.0086438931))
            ThreePointArc((-2.413, -29.0086438931), (-1.9666307345, -30.0862746276), (-0.889, -30.5326438931))
        make_face()
    extrude(amount=F27_DEPTH)


with BuildPart() as f23:
    # F22 (on Top) → F23 (new body)
    with BuildSketch(Plane.XY):
        with Locations((50.1387342811, -27.3660663515)):
            Circle(F22_R)
    extrude(amount=F23_DEPTH)


solid = Compound([f1.part, f3.part, f5.part, f7.part, f9.part, f19.part, f23.part])
